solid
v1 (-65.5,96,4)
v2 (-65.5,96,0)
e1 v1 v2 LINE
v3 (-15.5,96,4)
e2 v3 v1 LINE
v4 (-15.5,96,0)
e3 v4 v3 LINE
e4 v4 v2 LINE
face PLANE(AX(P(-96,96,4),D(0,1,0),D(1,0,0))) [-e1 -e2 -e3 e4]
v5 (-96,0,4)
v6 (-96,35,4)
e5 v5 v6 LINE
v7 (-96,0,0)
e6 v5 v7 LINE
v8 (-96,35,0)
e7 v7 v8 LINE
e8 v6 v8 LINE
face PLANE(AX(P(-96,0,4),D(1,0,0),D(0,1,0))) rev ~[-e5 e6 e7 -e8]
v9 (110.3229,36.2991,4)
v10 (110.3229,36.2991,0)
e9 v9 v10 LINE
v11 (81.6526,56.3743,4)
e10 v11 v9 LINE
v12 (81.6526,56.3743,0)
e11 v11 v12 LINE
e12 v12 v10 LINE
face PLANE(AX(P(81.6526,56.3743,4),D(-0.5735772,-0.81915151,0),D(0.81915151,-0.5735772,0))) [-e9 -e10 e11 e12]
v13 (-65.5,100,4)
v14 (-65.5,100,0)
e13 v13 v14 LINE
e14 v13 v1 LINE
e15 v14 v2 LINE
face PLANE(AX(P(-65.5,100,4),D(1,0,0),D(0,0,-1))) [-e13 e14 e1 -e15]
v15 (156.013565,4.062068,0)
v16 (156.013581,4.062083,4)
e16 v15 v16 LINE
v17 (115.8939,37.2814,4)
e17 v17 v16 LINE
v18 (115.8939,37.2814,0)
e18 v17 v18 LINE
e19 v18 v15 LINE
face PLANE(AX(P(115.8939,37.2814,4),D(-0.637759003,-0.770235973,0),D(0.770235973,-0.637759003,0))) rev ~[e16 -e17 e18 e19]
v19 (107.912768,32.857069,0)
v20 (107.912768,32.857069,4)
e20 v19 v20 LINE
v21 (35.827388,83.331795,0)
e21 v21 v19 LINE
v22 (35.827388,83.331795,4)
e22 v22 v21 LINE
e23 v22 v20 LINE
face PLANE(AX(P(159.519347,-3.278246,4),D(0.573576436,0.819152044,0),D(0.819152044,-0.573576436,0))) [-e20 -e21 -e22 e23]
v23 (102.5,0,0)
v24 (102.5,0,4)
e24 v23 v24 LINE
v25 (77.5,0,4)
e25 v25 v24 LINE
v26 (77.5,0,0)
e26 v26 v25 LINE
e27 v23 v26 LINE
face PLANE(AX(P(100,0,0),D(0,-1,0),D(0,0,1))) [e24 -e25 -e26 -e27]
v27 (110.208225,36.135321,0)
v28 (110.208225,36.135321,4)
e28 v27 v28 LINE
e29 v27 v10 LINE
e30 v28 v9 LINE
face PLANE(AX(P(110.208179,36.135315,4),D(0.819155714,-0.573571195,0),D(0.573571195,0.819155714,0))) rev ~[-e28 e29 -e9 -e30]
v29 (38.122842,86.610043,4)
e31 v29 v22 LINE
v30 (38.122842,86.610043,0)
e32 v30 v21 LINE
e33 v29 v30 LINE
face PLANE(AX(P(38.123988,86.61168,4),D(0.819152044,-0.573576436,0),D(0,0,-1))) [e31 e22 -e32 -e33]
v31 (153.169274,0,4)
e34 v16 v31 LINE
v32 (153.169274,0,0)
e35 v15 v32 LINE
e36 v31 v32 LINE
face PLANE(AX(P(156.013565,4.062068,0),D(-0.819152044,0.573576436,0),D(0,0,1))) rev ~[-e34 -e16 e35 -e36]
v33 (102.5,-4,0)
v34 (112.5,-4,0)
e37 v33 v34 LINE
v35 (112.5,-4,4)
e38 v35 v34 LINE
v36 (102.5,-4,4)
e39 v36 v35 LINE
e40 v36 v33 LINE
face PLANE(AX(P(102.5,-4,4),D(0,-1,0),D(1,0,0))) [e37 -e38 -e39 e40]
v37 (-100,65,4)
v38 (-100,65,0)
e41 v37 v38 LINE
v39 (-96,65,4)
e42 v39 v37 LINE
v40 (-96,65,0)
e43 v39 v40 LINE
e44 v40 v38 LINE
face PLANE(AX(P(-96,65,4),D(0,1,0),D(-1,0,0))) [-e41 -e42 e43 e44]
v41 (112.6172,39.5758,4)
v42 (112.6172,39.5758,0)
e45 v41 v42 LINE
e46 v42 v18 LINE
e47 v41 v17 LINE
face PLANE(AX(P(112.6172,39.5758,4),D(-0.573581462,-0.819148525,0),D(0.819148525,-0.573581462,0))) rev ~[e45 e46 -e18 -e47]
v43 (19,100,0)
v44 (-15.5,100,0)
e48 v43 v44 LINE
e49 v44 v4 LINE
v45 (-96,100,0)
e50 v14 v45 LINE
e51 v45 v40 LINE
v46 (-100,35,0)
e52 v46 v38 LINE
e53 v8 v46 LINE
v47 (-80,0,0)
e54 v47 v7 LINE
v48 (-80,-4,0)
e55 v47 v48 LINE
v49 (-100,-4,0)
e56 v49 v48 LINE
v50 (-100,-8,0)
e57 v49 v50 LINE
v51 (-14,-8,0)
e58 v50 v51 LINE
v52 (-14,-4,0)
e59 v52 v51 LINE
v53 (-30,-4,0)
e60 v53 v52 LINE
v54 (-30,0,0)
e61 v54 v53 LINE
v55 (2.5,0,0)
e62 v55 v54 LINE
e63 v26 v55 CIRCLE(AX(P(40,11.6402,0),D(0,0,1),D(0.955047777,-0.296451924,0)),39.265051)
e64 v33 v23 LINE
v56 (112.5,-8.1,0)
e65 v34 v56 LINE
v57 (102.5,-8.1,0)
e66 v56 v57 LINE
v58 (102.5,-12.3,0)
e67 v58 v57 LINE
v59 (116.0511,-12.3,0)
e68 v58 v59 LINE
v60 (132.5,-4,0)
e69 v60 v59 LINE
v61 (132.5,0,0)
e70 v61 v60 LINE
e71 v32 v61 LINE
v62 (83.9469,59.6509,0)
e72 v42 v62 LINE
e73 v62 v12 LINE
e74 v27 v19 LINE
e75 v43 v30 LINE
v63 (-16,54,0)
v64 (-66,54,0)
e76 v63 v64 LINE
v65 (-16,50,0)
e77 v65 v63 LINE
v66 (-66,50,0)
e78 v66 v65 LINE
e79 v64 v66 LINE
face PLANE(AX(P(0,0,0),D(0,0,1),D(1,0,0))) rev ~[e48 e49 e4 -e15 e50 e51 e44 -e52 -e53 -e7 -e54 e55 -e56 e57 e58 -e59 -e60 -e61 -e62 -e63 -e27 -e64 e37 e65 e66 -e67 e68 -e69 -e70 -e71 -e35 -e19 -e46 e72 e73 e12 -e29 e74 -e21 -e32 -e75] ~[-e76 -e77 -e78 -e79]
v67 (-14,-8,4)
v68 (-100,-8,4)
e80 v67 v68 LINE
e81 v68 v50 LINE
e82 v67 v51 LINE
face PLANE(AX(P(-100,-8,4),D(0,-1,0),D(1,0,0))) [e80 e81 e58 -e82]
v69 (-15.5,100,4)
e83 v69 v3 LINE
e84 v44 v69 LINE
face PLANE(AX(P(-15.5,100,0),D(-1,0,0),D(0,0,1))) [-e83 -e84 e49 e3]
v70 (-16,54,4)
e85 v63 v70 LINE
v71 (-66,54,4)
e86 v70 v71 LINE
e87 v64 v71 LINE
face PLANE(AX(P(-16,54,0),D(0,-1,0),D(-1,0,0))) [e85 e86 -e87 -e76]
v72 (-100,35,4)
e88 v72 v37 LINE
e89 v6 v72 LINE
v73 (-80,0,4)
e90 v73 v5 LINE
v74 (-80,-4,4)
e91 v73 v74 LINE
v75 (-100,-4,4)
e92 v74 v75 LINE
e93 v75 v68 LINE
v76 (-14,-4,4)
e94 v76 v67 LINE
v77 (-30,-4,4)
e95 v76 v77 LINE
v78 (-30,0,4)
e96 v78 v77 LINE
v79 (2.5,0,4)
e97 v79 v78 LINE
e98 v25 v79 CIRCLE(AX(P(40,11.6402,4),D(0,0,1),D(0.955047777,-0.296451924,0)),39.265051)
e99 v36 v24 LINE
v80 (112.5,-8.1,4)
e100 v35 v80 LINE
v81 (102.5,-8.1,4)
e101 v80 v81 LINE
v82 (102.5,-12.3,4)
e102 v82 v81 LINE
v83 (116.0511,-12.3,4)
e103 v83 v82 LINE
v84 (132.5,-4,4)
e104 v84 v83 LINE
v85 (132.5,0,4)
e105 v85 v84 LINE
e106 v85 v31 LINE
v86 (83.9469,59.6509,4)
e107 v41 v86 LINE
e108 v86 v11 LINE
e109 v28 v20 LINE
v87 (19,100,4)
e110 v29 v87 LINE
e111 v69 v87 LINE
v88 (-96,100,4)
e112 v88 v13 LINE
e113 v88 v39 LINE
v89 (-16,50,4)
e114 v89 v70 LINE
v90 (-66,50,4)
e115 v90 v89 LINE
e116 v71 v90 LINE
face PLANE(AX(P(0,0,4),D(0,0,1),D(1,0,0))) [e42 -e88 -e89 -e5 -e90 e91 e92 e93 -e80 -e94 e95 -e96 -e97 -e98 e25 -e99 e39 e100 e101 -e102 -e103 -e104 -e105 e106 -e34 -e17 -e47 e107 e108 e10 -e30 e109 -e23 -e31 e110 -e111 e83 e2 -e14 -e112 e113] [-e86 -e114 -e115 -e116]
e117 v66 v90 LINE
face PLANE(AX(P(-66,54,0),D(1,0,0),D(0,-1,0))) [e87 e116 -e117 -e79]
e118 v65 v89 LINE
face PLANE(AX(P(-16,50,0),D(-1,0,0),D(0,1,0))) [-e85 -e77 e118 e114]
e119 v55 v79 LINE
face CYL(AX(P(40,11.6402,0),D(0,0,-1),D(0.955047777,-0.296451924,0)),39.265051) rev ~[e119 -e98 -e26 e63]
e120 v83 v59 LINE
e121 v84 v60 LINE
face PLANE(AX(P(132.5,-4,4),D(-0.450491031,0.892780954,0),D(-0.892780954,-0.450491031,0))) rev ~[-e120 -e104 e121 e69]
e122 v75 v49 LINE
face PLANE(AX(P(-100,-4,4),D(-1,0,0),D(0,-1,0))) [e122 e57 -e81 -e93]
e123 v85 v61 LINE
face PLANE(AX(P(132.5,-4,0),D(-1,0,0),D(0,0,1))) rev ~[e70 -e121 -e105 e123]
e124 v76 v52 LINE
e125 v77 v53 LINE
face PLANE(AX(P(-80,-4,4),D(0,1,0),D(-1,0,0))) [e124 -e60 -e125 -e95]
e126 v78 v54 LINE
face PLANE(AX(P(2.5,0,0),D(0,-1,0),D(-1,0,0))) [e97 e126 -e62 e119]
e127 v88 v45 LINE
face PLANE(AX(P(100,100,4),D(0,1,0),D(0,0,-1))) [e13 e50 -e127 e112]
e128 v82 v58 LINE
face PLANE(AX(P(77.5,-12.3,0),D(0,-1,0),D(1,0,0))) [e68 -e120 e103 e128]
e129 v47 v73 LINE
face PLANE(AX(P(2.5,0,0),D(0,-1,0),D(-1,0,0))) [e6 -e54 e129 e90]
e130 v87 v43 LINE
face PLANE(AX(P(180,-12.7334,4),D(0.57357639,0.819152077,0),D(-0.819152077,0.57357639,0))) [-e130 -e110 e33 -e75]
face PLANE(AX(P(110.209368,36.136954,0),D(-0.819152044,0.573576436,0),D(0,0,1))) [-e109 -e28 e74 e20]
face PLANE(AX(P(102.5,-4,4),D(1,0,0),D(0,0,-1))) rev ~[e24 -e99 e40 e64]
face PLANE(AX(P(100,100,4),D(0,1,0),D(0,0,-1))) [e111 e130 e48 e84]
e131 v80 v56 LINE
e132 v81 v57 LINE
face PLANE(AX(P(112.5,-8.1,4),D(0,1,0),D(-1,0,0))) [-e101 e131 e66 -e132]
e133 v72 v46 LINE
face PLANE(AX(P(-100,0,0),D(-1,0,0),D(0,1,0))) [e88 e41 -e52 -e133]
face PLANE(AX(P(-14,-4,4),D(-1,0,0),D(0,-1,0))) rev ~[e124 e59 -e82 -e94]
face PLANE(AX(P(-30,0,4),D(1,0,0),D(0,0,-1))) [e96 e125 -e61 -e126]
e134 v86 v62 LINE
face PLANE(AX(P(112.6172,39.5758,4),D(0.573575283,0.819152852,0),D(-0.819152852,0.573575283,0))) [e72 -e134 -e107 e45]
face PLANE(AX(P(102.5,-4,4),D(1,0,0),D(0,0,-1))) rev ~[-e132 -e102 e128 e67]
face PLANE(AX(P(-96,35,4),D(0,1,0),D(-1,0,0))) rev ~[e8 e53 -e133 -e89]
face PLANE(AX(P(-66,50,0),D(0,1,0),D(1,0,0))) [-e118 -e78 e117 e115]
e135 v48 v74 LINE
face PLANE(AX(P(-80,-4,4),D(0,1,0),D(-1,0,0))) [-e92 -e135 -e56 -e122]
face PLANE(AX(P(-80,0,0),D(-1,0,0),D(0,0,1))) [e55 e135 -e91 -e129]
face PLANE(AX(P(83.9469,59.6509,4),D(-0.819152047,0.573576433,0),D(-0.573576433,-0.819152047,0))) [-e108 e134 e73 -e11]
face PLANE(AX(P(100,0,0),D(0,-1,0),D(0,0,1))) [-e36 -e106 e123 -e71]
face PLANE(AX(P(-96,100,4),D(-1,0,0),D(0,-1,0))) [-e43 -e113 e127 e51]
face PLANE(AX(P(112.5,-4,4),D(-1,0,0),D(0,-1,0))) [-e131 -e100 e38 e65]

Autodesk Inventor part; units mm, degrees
ref_plane "YZ Plane" through (0, 0, 0) normal (1, 0, 0) x (0, 1, 0)
ref_plane "XZ Plane" through (0, 0, 0) normal (0, 1, 0) x (-1, 0, 0)
ref_plane "XY Plane" through (0, 0, 0) normal (0, 0, 1) x (1, 0, 0)
sketch "Sketch1" plane through (0, 0, 0) normal (0, 0, 1) x (1, 0, 0)
  line L0 (-100, 100) -> (100, 100)
  line L1 (100, 100) -> (100, 0)
  line L2 (100, 0) -> (-100, 0)
  line L3 (-100, 0) -> (-100, 100)
  arc A0 (77.5, 0) -> (2.5, 0) centre (40, 11.6402) ccw
  point P0 (0, 0)
  point P1 (0, 100)
  point P2 (0, 0)
  dimension "d0" = 200
  dimension "d1" = 100
  dimension "d22" = 75
  dimension "d23" = 102.5
extrude "Extrusion1" add sketch "Sketch1" along normal blind 4 contours L0 L1 L2 A0 L3
sketch "Sketch2" plane through (0, 0, 4) normal (0, 0, 1) x (1, 0, 0)
  line L0 (-100, 100) -> (-100, 0) projected
  line L1 (-100, 0) -> (-96, 0)
  line L2 (-96, 0) -> (-96, 35)
  line L3 (-96, 35) -> (-100, 35)
  line L4 (-100, 35) -> (-100, 0)
  line L5 (-100, 100) -> (-96, 100)
  line L6 (-96, 100) -> (-96, 65)
  line L7 (-96, 65) -> (-100, 65)
  line L8 (-100, 65) -> (-100, 100)
  point P0 (0, 0)
  dimension "d9" = 4
  dimension "d10" = 35
  dimension "d11" = 4
  dimension "d12" = 35
extrude "Extrusion2" cut sketch "Sketch2" against normal through all
sketch "Sketch3" plane through (-24.1746, 0, 0) normal (0, -1, 0) x (1, 0, 0)
  line L0 (-71.8254, 4) -> (124.1746, 4) projected
  line L1 (-55.8254, 4) -> (-5.8254, 4)
  line L2 (-5.8254, 4) -> (-5.8254, 0)
  line L3 (-5.8254, 0) -> (-55.8254, 0)
  line L4 (-55.8254, 0) -> (-55.8254, 4)
  line L5 (-75.8254, 0) -> (-75.8254, 4) projected
  line L6 (124.1746, 0) -> (-71.8254, 0) projected
  line L7 (124.1746, 4) -> (-71.8254, 4) projected
  line L8 (124.1746, 0) -> (124.1746, 4) projected
  point P0 (24.1746, 0)
  point P1 (0, 4)
  point P2 (117.1746, 0)
  point P3 (105.1746, 4)
  point P4 (-5.8254, 4)
  dimension "d15" = 4
  dimension "d16" = 20
  dimension "d17" = 50
extrude "Extrusion3" add sketch "Sketch3" along normal blind 4 contours L0 L2 L3 L4
sketch "Sketch5" plane through (100, 0, 0) normal (1, 0, 0) x (0, 0, -1)
  line L0 (-4, 100) -> (-4, 65) projected
  line L1 (-4, 100) -> (0, 100)
  line L2 (0, 100) -> (0, 0)
  line L3 (0, 0) -> (-4, 0)
  line L4 (-4, 0) -> (-4, 100)
extrude "Extrusion5" add sketch "Sketch5" along normal blind 80
sketch "Sketch6" plane through (0, 0, 4) normal (0, 0, 1) x (1, 0, 0)
  line L0 (-96, 100) -> (180, 100) projected
  line L1 (180, 100) -> (19, 100)
  line L2 (180, 100) -> (180, 0) projected
  line L3 (180, 100) -> (180, -12.7334)
  line L4 (180, -12.7334) -> (19, 100)
  point P0 (0, 0)
  dimension "d30" = 35
  dimension "d33" = 115
extrude "Extrusion6" cut sketch "Sketch6" against normal blind 80
sketch "Sketch7" plane through (161.8148, 0, 4) normal (0.5735764, 0.819152, 0) x (0.819152, -0.5735764, 0)
  line L0 (0, 0) -> (-174.3447, 0) projected
  line L1 (-69.0666, 4) -> (-145.7265, 4) projected
  line L2 (-63, 0) -> (-113, 0)
  line L3 (-113, 0) -> (-113, 4)
  line L4 (-113, 4) -> (-63, 4)
  line L5 (-63, 4) -> (-63, 0)
  line L6 (0, 4) -> (0, 0) projected
  line L7 (-113, 0) -> (-151, 0)
  line L8 (-151, 0) -> (-151, 4)
  line L9 (-151, 4) -> (-113, 4)
  line L10 (-113, 4) -> (-113, 0)
  point P0 (-132.5509, 4)
  point P1 (-130.503, 4)
  point P2 (0, 2)
  point P3 (-63, 2)
  point P4 (-113, 0)
  point P5 (-151, 0)
  dimension "d34" = 50
  dimension "d35" = 63
  dimension "d56" = 38
extrude "Extrusion7" cut sketch "Sketch7" against normal blind 4
sketch "Sketch8" plane through (-96, 100, 4) normal (0, 1, 0) x (1, 0, 0)
  line L0 (112, 4) -> (0, 4)
  line L1 (63, 0) -> (80.5, 0)
  line L2 (30.5, 4) -> (80.5, 4)
  line L3 (80.5, 4) -> (80.5, 0)
  line L4 (80.5, 0) -> (30.5, 0)
  line L5 (30.5, 0) -> (30.5, 4)
  line L6 (0, 4) -> (0, 0)
  line L7 (0, 4) -> (0, 0) projected
  point P0 (96, 4)
  point P1 (80.5, 2)
  point P2 (30.5, 2)
  point P3 (80.5, 4)
  point P4 (0, 2)
  point P5 (0, 2)
  dimension "d38" = 50
  dimension "d42" = 30.5
extrude "Extrusion8" cut sketch "Sketch8" against normal blind 4
sketch "Sketch9" plane through (161.8148, 0, 4) normal (0.5735764, 0.819152, 0) x (0.819152, -0.5735764, 0)
  line L0 (-63, 4) -> (0, 4) projected
  line L1 (0, 0) -> (-63, 0) projected
  line L2 (0, 4) -> (-7.082, 4)
  line L3 (-7.082, 4) -> (-7.082, 0)
  line L4 (-7.082, 0) -> (0, 0)
  line L5 (0, 0) -> (0, 4)
  point P0 (-132.5509, 4)
  point P1 (-7.082, 4)
  dimension "d43" = 7.082
extrude "Extrusion9" cut sketch "Sketch9" against normal through all
sketch "Sketch10" plane through (77.5, 0, 0) normal (0, -1, 0) x (1, 0, 0)
  line L0 (30.4139, 4) -> (-41.6715, 4) projected
  line L1 (32.7082, 0) -> (78.5136, 0) projected
  line L2 (25, 4) -> (55, 4)
  line L3 (55, 4) -> (55, 0)
  line L4 (55, 0) -> (25, 0)
  line L5 (25, 0) -> (25, 4)
  line L6 (0, 0) -> (0, 4) projected
  point P0 (-77.5, 0)
  point P1 (-10.5437, 4)
  point P2 (25, 2)
  point P3 (0, 2)
  dimension "d46" = 30
  dimension "d47" = 25
extrude "Extrusion10" add sketch "Sketch10" along normal blind 4
sketch "Sketch11" plane through (0, 0, 0) normal (0, 0, -1) x (-1, 0, 0)
  line L0 (16, 54) -> (66, 54)
  line L1 (66, 54) -> (66, 50)
  line L2 (66, 50) -> (16, 50)
  line L3 (16, 50) -> (16, 54)
  line L4 (96, 0) -> (96, 35) projected
  point P0 (0, 0)
  point P1 (41, 50)
  dimension "d50" = 50
  dimension "d51" = 4
  dimension "d52" = 55
  dimension "d53" = 50
extrude "Extrusion11" cut sketch "Sketch11" against normal blind 4
sketch "Sketch15" plane through (0, 0, 4) normal (0, 0, 1) x (1, 0, 0)
  line L0 (107.9139, 32.8587) -> (35.8285, 83.3334) projected
  line L1 (107.9139, 32.8587) -> (100.9511, 37.7341)
  line L2 (110.2082, 36.1353) -> (107.9139, 32.8587) projected
  line L3 (107.9139, 32.8587) -> (112.6172, 39.5758)
  line L4 (110.2082, 36.1353) -> (113.4848, 33.841)
  line L5 (156.0136, 4.0621) -> (110.2082, 36.1353) projected
  line L6 (112.6172, 39.5758) -> (115.8939, 37.2814)
  line L7 (115.8939, 37.2814) -> (113.4848, 33.841)
  line L8 (112.6172, 39.5758) -> (83.9469, 59.6509)
  line L9 (83.9469, 59.6509) -> (81.6526, 56.3743)
  line L10 (81.6526, 56.3743) -> (110.3229, 36.2991)
  line L11 (115.8939, 37.2814) -> (156.0136, 4.0621)
  point P0 (0, 0)
  point P1 (120.2672, 29.092)
  dimension "d61" = 8.2
  dimension "d62" = 4
  dimension "d63" = 35
  dimension "d64" = 4
extrude "Extrusion12" add sketch "Sketch15" against normal blind 4
sketch "Sketch16" plane through (77.5, -4, 0) normal (0, -1, 0) x (1, 0, 0)
  line L0 (55, 0) -> (55, 4) projected
  line L1 (25, 0) -> (55, 0) projected
  line L2 (55, 4) -> (25, 4)
  line L3 (25, 4) -> (25, 0)
  line L4 (25, 0) -> (55, 0)
  line L5 (55, 0) -> (55, 4)
  point P0 (-77.5, 0)
extrude "Extrusion13" add sketch "Sketch16" along normal blind 8.3
sketch "Sketch17" plane through (0, 0, 4) normal (0, 0, 1) x (1, 0, 0)
  line L0 (77.5, 0) -> (102.5, 0) projected
  line L1 (102.5, 0) -> (102.5, -12.3) projected
  line L2 (102.5, -4) -> (112.5, -4)
  line L3 (112.5, -4) -> (112.5, -8.1)
  line L4 (112.5, -8.1) -> (102.5, -8.1)
  line L5 (102.5, -8.1) -> (102.5, -4)
  line L6 (132.5, -12.3) -> (102.5, -12.3) projected
  line L7 (117.5, -12.3) -> (132.5, -12.3)
  line L8 (132.5, -12.3) -> (132.5, 0)
  line L9 (132.5, -4) -> (116.0511, -12.3)
  point P0 (0, 0)
  dimension "d71" = 4
  dimension "d72" = 4.1
  dimension "d73" = 4.2
  dimension "d74" = 10
  dimension "d77" = 4
extrude "Extrusion14" cut sketch "Sketch17" against normal blind 8.3
sketch "Sketch21" plane through (0, 0, 4) normal (0, 0, 1) x (1, 0, 0)
  line L0 (-80, -4) -> (-100, -4)
  line L1 (-100, -4) -> (-100, -8)
  line L2 (-100, -8) -> (-80, -8)
  line L3 (-80, -8) -> (-80, -4)
  line L4 (-80, -4) -> (-30, -4)
  line L5 (-30, -4) -> (-30, -8)
  line L6 (-30, -8) -> (-80, -8)
  line L7 (-80, -8) -> (-80, -4)
  line L8 (-30, -4) -> (-30, -4)
  line L9 (-30, -8) -> (-14, -8)
  line L10 (-30, -4) -> (-14, -4)
  line L11 (-14, -4) -> (-14, -8)
  line L12 (-14, -8) -> (-30, -8)
  line L13 (-30, -8) -> (-30, -4)
  point P0 (0, 0)
  dimension "d80" = 20
  dimension "d81" = 4
  dimension "d82" = 50
  dimension "d85" = 16
extrude "Extrusion15" add sketch "Sketch21" against normal blind 4
properties part number "Tapa lateral 1"
